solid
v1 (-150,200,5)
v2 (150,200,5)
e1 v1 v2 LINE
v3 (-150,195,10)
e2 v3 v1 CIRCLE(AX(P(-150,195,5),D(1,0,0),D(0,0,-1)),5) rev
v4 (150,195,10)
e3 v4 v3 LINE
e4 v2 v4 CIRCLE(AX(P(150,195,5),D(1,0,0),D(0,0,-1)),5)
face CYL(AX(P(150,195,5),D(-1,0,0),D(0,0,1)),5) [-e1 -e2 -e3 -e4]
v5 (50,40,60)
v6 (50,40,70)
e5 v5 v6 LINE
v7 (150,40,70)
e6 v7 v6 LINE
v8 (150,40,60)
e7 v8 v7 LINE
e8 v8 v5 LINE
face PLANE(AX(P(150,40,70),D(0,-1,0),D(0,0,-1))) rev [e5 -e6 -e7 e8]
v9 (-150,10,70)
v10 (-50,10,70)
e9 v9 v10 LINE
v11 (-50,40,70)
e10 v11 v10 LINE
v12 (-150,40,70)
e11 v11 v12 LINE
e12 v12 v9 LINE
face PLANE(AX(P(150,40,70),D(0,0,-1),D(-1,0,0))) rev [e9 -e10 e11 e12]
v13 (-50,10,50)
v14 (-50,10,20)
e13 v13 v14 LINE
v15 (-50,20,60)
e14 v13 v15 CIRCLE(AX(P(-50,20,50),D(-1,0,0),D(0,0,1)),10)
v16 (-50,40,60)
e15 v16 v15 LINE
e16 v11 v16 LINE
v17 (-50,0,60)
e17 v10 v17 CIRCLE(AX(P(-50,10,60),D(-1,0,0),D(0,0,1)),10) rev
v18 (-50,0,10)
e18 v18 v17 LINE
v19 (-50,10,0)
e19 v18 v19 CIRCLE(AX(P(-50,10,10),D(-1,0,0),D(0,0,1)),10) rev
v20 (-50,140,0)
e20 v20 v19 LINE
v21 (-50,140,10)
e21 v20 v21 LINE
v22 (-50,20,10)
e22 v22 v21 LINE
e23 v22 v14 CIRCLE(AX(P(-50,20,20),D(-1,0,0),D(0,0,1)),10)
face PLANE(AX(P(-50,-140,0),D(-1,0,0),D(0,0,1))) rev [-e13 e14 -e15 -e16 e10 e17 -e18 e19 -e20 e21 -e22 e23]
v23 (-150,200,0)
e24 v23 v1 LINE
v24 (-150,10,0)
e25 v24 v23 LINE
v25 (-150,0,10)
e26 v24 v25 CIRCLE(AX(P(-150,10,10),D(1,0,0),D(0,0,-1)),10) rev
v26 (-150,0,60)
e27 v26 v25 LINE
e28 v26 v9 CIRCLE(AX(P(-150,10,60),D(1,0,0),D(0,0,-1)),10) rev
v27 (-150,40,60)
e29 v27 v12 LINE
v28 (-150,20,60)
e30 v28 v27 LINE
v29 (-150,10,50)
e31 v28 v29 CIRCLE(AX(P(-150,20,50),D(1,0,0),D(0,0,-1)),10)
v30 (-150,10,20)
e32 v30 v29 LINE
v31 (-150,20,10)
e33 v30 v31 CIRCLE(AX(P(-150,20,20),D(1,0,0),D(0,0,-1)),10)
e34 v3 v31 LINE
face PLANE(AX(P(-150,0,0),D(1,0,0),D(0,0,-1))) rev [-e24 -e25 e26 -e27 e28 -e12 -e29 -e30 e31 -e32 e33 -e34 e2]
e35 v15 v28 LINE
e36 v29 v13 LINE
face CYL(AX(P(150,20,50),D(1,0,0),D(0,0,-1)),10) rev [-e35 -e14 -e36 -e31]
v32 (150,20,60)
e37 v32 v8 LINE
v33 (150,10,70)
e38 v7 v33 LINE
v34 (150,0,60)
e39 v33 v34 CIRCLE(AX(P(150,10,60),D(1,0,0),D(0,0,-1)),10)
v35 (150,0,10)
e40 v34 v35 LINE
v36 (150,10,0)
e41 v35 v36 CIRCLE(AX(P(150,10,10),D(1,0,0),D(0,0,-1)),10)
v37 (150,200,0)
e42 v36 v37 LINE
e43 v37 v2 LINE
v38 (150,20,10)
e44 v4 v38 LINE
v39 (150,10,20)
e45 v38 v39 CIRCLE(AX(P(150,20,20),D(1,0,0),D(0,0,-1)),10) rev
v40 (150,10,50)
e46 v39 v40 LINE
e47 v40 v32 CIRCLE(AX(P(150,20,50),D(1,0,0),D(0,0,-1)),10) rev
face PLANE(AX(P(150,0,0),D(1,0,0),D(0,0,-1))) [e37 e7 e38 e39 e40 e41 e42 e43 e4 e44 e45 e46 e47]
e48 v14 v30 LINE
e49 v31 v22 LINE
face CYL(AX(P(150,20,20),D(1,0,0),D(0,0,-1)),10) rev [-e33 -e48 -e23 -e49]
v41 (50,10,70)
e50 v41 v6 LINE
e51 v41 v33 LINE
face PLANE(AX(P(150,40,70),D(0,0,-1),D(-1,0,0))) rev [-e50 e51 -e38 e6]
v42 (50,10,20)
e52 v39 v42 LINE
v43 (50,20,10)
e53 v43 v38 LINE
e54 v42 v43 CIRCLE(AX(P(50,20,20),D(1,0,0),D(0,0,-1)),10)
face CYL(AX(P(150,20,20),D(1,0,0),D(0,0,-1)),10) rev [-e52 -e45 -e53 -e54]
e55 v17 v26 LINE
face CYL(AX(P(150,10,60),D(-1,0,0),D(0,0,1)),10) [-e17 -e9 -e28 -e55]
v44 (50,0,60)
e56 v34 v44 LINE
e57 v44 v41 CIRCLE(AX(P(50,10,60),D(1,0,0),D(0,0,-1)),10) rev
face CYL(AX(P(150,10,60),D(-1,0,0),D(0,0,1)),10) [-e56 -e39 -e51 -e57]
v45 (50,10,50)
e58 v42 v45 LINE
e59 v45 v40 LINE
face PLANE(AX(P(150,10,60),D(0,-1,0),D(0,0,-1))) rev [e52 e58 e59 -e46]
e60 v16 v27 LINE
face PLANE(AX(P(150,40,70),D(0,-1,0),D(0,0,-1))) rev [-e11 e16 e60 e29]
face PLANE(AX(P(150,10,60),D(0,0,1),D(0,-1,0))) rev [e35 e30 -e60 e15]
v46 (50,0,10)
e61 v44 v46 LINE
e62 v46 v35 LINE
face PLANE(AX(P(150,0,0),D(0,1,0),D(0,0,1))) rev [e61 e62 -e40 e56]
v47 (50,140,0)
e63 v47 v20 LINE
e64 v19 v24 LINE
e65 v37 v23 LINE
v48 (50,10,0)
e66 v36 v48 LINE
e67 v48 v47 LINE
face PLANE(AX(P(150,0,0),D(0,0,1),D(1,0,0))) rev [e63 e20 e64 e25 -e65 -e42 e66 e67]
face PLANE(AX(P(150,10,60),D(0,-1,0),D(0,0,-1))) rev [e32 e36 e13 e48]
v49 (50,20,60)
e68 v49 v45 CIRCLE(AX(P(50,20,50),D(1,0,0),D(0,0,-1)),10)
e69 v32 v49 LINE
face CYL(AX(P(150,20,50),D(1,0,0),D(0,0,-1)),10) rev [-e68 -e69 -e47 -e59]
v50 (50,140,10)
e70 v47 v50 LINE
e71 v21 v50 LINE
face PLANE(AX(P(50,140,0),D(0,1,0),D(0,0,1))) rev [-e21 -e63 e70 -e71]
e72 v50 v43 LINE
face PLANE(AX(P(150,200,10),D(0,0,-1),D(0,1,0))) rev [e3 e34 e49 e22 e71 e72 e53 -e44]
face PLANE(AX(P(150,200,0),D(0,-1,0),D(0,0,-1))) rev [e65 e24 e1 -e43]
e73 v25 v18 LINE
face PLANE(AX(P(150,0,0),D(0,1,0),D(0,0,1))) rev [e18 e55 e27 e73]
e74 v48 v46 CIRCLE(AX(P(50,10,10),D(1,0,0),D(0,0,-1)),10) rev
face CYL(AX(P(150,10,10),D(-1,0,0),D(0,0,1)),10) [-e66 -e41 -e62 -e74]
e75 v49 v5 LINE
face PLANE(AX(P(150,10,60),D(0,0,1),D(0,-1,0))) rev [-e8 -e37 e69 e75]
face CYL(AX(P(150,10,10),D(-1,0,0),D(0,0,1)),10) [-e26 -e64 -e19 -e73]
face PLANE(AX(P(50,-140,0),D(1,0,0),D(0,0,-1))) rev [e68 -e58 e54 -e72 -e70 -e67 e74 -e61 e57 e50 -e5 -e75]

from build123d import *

# Parameters (mm, degrees)
BOSS_EXTRUDE2_DEPTH = 150
SKETCH3_W           = 100
SKETCH3_H           = 280
CUT_EXTRUDE3_DEPTH  = 260.615099715
FILLET2_START       = -151
FILLET2_DEPTH       = 302
FILLET2_START_2     = -150
FILLET2_2_DEPTH     = 100
FILLET2_START_3     = 50
FILLET2_3_DEPTH     = 100
FILLET3_R           = 5


with BuildPart() as part:
    # Sketch2 → Boss-Extrude2 (new, symmetric)
    with BuildSketch(Plane(origin=(0, 0, 0), x_dir=(0, 0, -1), z_dir=(1, 0, 0))):
        Polygon((-60, 10), (-10, 10), (-10, 200), (0, 200), (0, 0), (-26, 0), (-70, 0), (-70, 40), (-60, 40), align=None)
    extrude(amount=BOSS_EXTRUDE2_DEPTH, both=True)

    # Sketch3 → Cut-Extrude3 (cut, through all)
    with BuildSketch(Plane.XY.offset(70)):
        Rectangle(SKETCH3_W, SKETCH3_H)
    extrude(amount=-CUT_EXTRUDE3_DEPTH, mode=Mode.SUBTRACT)

    # Fillet2: read off the stored shape, not the designer's step
    # Fillet2 outline → Fillet2 (cut)
    with BuildSketch(Plane.YZ.offset(FILLET2_START)):
        with BuildLine():
            Line((0, 0), (10, 0))
            ThreePointArc((10, 0), (2.928932188, 2.928932188), (0, 10))
            Line((0, 10), (0, 0))
        make_face()
        with BuildLine():
            Line((0, 70), (0, 60))
            ThreePointArc((0, 60), (2.928932188, 67.071067812), (10, 70))
            Line((10, 70), (0, 70))
        make_face()
    extrude(amount=FILLET2_DEPTH, mode=Mode.SUBTRACT)

    # Fillet2 2 outline → Fillet2 2 (add)
    with BuildSketch(Plane.YZ.offset(FILLET2_START_2)):
        with BuildLine():
            Line((10, 60), (10, 50))
            ThreePointArc((10, 50), (12.928932188, 57.071067812), (20, 60))
            Line((20, 60), (10, 60))
        make_face()
        with BuildLine():
            ThreePointArc((20, 10), (12.928932188, 12.928932188), (10, 20))
            Line((10, 20), (10, 10))
            Line((10, 10), (20, 10))
        make_face()
    extrude(amount=FILLET2_2_DEPTH)

    # Fillet2 3 outline → Fillet2 3 (add)
    with BuildSketch(Plane.YZ.offset(FILLET2_START_3)):
        with BuildLine():
            Line((10, 60), (10, 50))
            ThreePointArc((10, 50), (12.928932188, 57.071067812), (20, 60))
            Line((20, 60), (10, 60))
        make_face()
        with BuildLine():
            ThreePointArc((20, 10), (12.928932188, 12.928932188), (10, 20))
            Line((10, 20), (10, 10))
            Line((10, 10), (20, 10))
        make_face()
    extrude(amount=FILLET2_3_DEPTH)

    # Fillet3
    fillet3_edges = [part.edges().sort_by_distance(p)[0] for p in [
        (0, 200, 10),
    ]]
    fillet(fillet3_edges, radius=FILLET3_R)


solid = part.part
